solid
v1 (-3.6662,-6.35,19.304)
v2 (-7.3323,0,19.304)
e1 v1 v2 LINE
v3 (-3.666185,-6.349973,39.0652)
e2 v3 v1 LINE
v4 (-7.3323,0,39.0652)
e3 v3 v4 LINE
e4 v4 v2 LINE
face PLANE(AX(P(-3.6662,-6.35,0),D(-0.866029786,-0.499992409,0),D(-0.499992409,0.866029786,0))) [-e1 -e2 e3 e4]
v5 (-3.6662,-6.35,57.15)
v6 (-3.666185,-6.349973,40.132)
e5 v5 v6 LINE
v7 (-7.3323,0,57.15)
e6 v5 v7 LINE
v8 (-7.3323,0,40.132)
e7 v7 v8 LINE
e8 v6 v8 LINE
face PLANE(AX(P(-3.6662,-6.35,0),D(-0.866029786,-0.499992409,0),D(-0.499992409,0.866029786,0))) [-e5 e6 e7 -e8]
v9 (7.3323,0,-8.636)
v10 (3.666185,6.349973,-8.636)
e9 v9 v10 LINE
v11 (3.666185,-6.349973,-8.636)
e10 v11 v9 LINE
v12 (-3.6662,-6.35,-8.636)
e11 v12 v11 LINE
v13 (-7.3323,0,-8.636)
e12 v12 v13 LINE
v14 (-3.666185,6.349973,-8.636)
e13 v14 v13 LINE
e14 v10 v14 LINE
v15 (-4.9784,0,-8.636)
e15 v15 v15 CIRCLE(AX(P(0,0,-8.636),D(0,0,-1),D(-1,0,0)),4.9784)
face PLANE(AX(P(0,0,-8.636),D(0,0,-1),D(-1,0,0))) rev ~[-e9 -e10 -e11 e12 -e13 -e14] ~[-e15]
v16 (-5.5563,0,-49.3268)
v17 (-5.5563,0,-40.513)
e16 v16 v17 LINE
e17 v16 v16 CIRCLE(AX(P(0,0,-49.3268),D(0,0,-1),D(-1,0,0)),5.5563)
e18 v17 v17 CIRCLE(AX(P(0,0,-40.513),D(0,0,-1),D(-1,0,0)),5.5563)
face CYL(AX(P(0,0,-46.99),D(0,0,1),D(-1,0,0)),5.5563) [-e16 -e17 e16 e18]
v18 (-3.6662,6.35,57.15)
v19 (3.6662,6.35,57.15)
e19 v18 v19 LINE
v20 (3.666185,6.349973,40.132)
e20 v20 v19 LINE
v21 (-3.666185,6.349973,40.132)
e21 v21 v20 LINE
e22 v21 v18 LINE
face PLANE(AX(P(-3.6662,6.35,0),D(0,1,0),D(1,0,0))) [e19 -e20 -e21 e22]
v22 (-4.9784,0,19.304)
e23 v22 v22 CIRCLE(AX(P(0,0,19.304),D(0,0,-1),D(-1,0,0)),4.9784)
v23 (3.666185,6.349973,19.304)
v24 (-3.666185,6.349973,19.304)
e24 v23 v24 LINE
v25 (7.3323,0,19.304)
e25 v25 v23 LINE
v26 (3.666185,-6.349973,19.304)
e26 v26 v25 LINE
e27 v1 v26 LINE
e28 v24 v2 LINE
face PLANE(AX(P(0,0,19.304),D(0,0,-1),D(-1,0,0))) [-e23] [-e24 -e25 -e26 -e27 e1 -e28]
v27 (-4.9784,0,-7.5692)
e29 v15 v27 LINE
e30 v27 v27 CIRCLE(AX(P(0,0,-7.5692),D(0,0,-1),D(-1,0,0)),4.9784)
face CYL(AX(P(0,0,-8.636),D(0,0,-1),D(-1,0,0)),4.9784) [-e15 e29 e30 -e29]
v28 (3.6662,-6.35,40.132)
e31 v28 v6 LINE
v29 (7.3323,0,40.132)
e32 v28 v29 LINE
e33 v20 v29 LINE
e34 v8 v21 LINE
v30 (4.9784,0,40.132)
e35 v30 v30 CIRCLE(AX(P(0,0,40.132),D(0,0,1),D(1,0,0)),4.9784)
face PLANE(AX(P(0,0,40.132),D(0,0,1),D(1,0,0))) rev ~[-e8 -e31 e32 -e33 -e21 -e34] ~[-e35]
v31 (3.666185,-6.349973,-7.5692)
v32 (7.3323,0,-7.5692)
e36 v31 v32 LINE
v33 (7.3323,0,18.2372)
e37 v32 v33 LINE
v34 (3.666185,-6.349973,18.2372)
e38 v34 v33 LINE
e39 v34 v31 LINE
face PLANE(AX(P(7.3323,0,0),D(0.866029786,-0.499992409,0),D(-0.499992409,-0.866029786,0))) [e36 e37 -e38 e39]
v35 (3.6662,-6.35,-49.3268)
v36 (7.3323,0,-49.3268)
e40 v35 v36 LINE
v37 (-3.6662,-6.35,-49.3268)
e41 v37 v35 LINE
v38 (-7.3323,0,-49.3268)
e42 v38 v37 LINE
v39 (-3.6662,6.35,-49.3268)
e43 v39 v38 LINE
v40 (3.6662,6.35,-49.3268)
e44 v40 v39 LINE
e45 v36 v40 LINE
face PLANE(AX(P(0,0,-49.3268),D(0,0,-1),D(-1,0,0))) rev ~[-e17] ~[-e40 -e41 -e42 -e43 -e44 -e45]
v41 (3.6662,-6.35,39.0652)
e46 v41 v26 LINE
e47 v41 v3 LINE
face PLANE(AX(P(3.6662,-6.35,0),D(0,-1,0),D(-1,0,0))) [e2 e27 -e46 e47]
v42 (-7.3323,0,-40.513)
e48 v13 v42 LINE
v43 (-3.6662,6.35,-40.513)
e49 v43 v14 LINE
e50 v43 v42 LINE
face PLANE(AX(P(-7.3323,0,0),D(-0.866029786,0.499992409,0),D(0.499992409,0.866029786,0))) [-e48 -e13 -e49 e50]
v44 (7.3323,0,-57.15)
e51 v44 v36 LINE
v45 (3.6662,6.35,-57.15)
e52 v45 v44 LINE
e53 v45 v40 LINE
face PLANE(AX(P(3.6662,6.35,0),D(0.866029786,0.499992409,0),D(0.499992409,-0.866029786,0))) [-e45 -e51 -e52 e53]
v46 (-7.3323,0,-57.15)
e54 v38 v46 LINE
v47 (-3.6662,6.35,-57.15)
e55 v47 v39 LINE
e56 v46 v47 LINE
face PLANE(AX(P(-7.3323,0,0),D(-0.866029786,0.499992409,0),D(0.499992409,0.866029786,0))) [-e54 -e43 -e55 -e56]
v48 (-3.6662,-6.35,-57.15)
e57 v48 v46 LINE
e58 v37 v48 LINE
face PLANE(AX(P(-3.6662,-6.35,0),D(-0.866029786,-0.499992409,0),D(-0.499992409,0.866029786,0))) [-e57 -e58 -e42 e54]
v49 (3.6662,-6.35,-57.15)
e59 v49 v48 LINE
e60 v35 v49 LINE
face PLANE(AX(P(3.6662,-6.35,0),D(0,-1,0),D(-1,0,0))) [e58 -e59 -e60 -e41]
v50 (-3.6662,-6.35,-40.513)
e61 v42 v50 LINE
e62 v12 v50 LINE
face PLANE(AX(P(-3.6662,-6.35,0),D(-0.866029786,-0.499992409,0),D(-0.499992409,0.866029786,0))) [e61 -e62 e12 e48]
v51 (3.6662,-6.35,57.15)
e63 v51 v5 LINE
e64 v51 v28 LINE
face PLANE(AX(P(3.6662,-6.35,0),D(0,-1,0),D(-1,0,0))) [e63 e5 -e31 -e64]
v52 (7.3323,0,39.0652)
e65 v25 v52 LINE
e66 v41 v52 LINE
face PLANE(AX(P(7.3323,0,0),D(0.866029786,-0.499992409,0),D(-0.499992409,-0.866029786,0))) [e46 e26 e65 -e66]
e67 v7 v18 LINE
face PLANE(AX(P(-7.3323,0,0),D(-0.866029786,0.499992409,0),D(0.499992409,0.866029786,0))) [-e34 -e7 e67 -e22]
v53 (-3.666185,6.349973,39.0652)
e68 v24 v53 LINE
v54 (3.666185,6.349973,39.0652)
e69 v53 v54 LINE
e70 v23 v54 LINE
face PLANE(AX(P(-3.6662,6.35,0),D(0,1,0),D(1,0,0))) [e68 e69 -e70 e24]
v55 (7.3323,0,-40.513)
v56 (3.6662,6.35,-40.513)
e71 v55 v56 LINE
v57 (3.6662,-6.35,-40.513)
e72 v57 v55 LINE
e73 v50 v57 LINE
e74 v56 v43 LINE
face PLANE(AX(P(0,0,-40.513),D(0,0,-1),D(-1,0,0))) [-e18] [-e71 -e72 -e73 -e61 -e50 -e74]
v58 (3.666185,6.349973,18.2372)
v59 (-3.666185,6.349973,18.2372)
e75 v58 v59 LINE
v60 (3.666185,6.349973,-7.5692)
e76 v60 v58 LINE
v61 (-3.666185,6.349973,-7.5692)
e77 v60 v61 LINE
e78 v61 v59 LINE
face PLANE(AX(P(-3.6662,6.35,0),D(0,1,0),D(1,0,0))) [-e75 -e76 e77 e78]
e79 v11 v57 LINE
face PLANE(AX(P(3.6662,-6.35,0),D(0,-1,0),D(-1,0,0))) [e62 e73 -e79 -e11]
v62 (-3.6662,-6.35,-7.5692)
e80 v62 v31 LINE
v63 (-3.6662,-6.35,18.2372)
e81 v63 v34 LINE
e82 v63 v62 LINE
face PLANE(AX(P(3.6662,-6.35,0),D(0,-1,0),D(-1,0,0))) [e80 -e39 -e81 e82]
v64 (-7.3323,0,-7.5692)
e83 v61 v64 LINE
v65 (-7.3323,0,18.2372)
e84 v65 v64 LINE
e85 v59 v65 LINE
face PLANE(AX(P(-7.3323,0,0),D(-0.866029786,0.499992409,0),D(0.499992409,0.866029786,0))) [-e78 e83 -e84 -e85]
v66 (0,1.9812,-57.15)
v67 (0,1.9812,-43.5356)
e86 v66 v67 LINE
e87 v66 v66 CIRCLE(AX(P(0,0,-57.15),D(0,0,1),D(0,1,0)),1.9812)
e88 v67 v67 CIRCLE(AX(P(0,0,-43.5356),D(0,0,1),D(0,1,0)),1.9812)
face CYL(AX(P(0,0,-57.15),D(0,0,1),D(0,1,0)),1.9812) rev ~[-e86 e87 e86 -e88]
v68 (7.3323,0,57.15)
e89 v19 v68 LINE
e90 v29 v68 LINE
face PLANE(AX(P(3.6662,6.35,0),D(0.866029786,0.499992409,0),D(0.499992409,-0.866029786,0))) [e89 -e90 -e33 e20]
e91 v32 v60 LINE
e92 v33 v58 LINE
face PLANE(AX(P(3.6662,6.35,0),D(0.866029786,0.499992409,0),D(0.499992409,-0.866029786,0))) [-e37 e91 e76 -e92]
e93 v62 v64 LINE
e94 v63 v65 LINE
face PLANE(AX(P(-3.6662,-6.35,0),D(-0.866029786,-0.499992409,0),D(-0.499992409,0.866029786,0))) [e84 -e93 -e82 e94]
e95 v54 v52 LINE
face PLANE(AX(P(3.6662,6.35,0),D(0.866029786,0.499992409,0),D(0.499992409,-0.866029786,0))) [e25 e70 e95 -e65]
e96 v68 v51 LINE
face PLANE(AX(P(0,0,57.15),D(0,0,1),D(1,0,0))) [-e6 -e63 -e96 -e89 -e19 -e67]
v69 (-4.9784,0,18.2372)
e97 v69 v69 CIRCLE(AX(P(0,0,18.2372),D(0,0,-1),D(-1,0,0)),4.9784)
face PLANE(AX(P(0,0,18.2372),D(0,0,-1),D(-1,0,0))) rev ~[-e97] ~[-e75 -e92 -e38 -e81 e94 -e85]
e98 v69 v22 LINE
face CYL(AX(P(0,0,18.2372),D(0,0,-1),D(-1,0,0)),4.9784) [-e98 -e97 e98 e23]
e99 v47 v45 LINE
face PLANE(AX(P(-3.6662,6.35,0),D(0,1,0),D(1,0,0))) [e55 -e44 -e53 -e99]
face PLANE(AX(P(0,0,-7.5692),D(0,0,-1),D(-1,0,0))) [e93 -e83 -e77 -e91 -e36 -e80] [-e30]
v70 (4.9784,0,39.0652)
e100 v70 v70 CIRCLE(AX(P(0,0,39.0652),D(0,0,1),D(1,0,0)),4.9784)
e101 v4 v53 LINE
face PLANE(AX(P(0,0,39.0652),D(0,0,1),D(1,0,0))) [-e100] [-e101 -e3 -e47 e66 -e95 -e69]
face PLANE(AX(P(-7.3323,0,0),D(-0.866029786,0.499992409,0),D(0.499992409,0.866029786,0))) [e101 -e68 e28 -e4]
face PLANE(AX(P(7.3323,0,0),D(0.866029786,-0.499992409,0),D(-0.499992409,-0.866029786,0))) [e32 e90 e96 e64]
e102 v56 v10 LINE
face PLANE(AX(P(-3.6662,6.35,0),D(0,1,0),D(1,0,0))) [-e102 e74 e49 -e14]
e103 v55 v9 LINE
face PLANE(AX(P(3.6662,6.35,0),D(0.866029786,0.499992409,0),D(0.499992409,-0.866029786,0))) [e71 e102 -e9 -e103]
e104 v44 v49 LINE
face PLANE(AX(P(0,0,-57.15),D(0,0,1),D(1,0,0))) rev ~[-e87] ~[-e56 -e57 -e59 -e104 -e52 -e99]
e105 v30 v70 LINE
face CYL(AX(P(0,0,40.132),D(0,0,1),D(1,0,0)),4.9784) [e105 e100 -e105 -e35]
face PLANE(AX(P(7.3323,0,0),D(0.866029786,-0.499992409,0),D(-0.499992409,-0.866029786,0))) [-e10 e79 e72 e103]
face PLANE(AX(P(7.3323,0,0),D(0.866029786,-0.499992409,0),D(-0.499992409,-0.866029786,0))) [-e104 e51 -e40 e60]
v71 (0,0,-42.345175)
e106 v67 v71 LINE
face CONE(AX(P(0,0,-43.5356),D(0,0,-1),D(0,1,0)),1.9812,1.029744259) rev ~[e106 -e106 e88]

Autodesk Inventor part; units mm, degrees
ref_plane "YZ Plane" through (0, 0, 0) normal (1, 0, 0) x (0, 1, 0)
ref_plane "XZ Plane" through (0, 0, 0) normal (0, 1, 0) x (-1, 0, 0)
ref_plane "XY Plane" through (0, 0, 0) normal (0, 0, 1) x (1, 0, 0)
sketch "Sketch1" plane through (0, 0, 0) normal (0, 0, 1) x (1, 0, 0)
  line L0 (7.3323, 0) -> (3.6662, -6.35)
  line L1 (3.6662, -6.35) -> (-3.6662, -6.35)
  line L2 (-3.6662, -6.35) -> (-7.3323, 0)
  line L3 (-7.3323, 0) -> (-3.6662, 6.35)
  line L4 (-3.6662, 6.35) -> (3.6662, 6.35)
  line L5 (3.6662, 6.35) -> (7.3323, 0)
  point P0 (0, 0)
  point P1 (0, 0)
  dimension "d0" = 12.7
extrude "Extrusion1" add sketch "Sketch1" along normal mid plane 114.3
sketch "Sketch10" plane through (0, 0, -57.15) normal (0, 0, -1) x (-1, 0, 0)
  point P0 (0, 0)
  point P1 (0, 0)
hole "Hole3" at (0, 0, -57.15) direction (0, 0, 1) diameter 3.9624 depth 13.6144 tip angle 118 thread size "10-32 UNF" class "2B" standard "ANSI Unified Screw Threads"
ref_plane "Work Plane4" through (0, 0, -46.99) normal (0, 0, -1) x (-1, 0, 0)
ref_plane "Work Plane5" through (0, 0, -8.636) normal (0, 0, -1) x (-1, 0, 0)
ref_plane "Work Plane6" through (0, 0, 18.2372) normal (0, 0, -1) x (-1, 0, 0)
sketch "Sketch13" plane through (0, 0, 18.2372) normal (0, 0, -1) x (-1, 0, 0)
  circle A0 centre (0, 0) radius 1.9812
  circle A1 centre (0, 0) radius 4.9784
  line L0 (3.6662, -6.35) -> (7.3323, 0)
  circle A2 centre (0, 0) radius 7.3323
  dimension "d51" = 9.9568
extrude "Extrusion7" cut sketch "Sketch13" against normal blind 1.0668 contours A2 L0 | L0 A2
ref_plane "Work Plane7" through (0, 0, 40.132) normal (0, 0, 1) x (1, 0, 0)
sketch "Sketch15" plane through (0, 0, 40.132) normal (0, 0, 1) x (1, 0, 0)
  circle A0 centre (0, 0) radius 1.9812
  circle A1 centre (0, 0) radius 4.9784
  line L0 (3.6662, -6.35) -> (7.3323, 0)
  circle A2 centre (0, 0) radius 7.3323
  dimension "d60" = 9.9568
extrude "Extrusion9" cut sketch "Sketch15" against normal blind 1.0668 contours A2 L0 | L0 A2
sketch "Sketch16" plane through (0, 0, 39.0652) normal (0, 0, 1) x (1, 0, 0)
  point P0 (0, 0)
sketch "Sketch17" plane through (0, 0, -46.99) normal (0, 0, -1) x (-1, 0, 0)
  circle A0 centre (0, 0) radius 1.9812 projected
  circle A1 centre (0, 0) radius 5.5563
  line L0 (-3.6662, 6.35) -> (3.6662, 6.35) projected
  line L1 (3.6662, 6.35) -> (7.3323, 0) projected
  line L2 (7.3323, 0) -> (3.6662, -6.35) projected
  line L3 (3.6662, -6.35) -> (-3.6662, -6.35) projected
  line L4 (-3.6662, -6.35) -> (-7.3323, 0) projected
  line L5 (-7.3323, 0) -> (-3.6662, 6.35) projected
  dimension "d64" = 11.1125
extrude "Extrusion10" cut sketch "Sketch17" along normal blind 2.3368 and the other way blind 6.477 contours L0 L1 L2 L3 L4 L5
sketch "Sketch18" plane through (0, 0, -8.636) normal (0, 0, -1) x (-1, 0, 0)
  circle A0 centre (0, 0) radius 1.9812
  circle A1 centre (0, 0) radius 4.9784
  line L0 (3.6662, -6.35) -> (7.3323, 0)
  circle A2 centre (0, 0) radius 7.3323
  dimension "d69" = 9.9568
extrude "Extrusion11" cut sketch "Sketch18" against normal blind 1.0668 contours A2 L0 | L0 A2
properties part number "Ch-1-01-0.5x4.5HexShaft" material "Steel, Alloy"
